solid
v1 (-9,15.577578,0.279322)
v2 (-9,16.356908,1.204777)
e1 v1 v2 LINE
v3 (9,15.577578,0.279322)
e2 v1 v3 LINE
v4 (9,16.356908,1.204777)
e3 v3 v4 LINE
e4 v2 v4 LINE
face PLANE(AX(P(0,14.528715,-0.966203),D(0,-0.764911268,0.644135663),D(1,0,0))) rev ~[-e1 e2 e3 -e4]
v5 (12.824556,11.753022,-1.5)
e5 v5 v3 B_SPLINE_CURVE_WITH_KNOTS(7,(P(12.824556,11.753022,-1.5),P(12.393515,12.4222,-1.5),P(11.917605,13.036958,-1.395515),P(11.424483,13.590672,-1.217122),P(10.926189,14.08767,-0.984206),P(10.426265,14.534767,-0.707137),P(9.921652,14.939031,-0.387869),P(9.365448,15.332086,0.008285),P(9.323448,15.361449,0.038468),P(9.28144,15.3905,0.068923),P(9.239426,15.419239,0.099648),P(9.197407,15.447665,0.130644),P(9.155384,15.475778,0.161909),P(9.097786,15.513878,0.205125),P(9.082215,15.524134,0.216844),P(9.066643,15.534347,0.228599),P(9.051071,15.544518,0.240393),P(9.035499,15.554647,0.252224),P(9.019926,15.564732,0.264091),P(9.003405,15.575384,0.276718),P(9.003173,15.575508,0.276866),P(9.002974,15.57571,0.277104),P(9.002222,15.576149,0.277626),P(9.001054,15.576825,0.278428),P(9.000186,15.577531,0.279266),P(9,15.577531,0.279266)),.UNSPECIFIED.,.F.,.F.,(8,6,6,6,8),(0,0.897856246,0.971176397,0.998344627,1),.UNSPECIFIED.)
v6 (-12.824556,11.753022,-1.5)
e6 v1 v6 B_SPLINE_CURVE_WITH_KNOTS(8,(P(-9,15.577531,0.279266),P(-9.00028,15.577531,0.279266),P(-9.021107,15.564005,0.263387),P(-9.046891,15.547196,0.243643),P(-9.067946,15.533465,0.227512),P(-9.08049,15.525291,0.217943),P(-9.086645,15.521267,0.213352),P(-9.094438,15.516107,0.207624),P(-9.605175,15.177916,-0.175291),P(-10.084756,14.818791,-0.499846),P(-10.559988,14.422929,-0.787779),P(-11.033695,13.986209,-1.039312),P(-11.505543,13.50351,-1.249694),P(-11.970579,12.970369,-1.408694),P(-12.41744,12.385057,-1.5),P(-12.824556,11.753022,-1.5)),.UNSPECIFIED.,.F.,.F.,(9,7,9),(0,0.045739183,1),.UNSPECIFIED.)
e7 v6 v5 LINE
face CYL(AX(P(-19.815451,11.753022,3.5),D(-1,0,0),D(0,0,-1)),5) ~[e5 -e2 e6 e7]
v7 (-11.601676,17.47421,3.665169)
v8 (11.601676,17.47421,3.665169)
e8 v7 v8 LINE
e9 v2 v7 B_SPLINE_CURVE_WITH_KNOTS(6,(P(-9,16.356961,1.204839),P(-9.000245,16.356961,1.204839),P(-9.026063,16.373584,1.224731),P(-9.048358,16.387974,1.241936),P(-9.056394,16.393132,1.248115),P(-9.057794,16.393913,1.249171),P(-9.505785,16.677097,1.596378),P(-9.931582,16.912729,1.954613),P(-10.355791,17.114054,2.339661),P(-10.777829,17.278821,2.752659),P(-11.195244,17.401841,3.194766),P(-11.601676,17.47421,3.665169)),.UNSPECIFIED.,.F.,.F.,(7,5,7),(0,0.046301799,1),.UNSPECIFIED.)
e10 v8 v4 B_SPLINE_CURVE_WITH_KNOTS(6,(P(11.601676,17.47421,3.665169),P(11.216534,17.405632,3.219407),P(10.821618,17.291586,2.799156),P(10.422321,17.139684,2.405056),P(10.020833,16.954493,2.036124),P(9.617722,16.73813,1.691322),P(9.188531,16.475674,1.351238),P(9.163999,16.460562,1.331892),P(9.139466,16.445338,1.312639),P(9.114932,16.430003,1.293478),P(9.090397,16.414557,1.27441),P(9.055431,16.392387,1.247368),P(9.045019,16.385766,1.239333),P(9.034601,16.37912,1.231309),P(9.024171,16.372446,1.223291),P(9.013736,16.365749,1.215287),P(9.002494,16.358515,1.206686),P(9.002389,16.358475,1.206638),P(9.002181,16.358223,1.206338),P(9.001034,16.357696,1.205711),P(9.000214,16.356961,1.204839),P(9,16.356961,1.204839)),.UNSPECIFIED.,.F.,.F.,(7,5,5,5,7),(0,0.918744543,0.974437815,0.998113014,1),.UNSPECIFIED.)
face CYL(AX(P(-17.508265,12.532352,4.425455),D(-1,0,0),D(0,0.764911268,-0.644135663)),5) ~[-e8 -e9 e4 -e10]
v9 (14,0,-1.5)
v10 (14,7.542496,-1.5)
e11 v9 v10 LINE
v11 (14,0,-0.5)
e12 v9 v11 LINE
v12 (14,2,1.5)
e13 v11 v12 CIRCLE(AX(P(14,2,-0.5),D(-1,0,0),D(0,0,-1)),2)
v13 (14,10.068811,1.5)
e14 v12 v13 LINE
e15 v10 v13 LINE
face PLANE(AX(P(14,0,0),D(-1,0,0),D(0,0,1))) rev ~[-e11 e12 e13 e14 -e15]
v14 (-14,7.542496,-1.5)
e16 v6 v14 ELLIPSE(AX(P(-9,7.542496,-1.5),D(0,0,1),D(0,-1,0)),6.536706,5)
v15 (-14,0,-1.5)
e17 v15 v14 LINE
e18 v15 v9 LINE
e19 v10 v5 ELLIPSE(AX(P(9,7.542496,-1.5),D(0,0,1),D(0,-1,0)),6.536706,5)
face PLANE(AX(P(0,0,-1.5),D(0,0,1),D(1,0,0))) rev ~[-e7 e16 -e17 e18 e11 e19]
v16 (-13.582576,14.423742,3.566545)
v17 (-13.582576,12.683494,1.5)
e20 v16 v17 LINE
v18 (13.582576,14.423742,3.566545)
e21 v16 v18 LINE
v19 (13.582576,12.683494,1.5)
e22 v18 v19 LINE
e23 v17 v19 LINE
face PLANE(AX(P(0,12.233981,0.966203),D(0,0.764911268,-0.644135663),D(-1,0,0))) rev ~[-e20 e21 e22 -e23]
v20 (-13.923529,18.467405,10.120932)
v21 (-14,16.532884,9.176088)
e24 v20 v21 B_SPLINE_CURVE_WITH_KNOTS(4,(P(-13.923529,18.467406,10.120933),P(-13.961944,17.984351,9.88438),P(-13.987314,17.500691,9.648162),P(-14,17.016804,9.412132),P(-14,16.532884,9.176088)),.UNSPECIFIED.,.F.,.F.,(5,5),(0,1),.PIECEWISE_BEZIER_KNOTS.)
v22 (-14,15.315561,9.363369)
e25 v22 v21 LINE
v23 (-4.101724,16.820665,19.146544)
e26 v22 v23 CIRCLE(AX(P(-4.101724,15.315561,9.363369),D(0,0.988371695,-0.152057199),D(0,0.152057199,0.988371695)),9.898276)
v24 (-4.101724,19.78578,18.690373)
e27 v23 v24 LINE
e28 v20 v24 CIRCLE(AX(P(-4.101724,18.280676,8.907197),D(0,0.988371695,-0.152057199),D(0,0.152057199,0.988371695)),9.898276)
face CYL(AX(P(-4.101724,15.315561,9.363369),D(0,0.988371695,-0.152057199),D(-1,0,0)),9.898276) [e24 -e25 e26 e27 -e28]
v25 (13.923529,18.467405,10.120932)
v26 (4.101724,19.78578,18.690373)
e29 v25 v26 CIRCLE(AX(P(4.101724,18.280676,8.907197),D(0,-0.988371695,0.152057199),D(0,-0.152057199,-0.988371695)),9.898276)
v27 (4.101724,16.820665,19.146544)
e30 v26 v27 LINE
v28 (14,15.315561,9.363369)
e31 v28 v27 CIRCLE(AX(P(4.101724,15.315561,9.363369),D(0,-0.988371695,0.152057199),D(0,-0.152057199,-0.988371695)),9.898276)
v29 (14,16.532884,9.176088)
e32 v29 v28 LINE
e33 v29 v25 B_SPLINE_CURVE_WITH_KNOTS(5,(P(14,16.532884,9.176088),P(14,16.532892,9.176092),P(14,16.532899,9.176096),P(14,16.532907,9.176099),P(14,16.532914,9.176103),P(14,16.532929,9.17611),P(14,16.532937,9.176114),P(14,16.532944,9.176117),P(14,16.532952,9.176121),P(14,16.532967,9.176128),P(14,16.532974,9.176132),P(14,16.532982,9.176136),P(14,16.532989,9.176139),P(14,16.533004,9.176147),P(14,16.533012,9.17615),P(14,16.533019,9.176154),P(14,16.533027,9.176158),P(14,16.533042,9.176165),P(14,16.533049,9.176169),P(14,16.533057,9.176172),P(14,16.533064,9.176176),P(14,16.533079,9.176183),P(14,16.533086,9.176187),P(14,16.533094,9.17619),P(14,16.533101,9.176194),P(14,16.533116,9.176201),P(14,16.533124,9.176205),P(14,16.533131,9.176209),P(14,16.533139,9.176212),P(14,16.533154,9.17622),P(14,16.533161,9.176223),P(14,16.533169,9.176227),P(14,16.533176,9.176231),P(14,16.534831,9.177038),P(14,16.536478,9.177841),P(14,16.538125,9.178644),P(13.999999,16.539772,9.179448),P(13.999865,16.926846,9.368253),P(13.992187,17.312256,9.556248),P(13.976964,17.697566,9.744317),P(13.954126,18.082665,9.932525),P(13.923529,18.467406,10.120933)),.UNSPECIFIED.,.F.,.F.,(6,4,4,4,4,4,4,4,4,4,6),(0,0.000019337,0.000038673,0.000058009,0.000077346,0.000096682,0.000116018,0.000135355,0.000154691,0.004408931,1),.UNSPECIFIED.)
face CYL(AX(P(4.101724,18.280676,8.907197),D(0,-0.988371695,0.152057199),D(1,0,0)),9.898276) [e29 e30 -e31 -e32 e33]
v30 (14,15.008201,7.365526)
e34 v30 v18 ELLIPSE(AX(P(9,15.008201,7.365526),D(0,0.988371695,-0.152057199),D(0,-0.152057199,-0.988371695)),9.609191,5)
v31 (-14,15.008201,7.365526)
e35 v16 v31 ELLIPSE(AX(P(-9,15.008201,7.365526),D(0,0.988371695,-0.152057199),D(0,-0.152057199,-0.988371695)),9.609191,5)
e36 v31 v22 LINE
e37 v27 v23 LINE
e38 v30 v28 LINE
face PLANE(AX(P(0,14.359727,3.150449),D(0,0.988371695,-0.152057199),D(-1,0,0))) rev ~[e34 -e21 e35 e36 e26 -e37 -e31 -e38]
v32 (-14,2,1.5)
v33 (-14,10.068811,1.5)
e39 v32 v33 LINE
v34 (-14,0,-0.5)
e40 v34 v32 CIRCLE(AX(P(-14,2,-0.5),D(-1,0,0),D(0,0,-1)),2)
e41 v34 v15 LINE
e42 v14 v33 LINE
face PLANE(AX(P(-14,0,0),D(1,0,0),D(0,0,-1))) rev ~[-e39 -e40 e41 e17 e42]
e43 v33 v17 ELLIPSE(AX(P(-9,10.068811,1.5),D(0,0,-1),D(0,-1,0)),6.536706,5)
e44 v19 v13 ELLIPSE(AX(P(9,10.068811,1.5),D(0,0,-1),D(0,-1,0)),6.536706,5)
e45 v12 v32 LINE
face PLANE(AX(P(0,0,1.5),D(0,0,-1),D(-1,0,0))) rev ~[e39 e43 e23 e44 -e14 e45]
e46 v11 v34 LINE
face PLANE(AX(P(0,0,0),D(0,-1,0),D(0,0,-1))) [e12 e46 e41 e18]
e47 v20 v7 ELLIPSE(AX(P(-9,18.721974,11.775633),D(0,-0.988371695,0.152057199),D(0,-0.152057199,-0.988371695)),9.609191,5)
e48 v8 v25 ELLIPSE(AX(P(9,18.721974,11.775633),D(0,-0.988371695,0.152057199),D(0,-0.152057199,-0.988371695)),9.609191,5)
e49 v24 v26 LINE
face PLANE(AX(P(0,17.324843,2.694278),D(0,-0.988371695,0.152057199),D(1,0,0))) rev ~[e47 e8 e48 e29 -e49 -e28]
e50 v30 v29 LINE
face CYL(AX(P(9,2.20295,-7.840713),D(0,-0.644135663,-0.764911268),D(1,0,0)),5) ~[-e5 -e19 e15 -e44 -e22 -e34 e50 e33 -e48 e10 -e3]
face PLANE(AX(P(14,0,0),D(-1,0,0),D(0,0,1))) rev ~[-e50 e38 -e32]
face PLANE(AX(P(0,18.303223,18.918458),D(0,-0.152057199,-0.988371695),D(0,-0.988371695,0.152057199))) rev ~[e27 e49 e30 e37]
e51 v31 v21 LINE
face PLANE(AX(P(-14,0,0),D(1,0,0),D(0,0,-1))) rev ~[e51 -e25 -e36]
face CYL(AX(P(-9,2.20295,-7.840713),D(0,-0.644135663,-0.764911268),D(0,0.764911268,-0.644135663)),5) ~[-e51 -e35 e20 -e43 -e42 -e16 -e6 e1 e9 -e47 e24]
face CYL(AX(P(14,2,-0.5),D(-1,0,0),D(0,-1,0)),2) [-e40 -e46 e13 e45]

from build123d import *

# Parameters (mm, degrees)
F0_W        = 28
F0_H        = 3
F3_R        = 9.8982756057
F4_R        = 2
F5_T1_DEPTH = 29.9393718709
F5_T3_DEPTH = 39.6309025582
F5_T5_DEPTH = 35.0165294795


# Not quite as in the source:
# - a fillet or chamfer that OpenCascade refuses, or shapes differently, is made with other operations: its cross-section is extruded or revolved along the edge and cut away or added


with BuildPart() as f2:
    # F2: sweep along a path in F1
    with BuildLine(Plane.YZ) as f2_path:
        Line((0, 0), (13.3813479915, 0))
        Line((13.3813479915, 0), (15.8422850072, 2.9223633464))
        Line((15.8422850072, 2.9223633464), (18.3032229543, 18.9184583724))
    # F0 (on Front) → F2 (sweep)
    with BuildSketch(Plane.XZ):
        Rectangle(F0_W, F0_H)
    sweep(path=f2_path.line, transition=Transition.RIGHT)

    # F3
    f3_edges = [f2.edges().sort_by_distance(p)[0] for p in [
        (14, 18.303223, 18.918458),
        (-14, 18.303223, 18.918458),
    ]]
    fillet(f3_edges, radius=F3_R)

    # F4
    f4_edges = [f2.edges().sort_by_distance(p)[0] for p in [
        (0, 0, 1.5),
    ]]
    fillet(f4_edges, radius=F4_R)

    # F5: fillet of radius 5 on 4 edges, made by hand

    # F5_s2 → F5_t1 (cut)
    with BuildSketch(Plane(origin=(0, -2.9491433719, -3.5021085214), x_dir=(1, 0, 0), z_dir=(0, 0.6441356632, 0.7649112677))):
        with BuildLine():
            ThreePointArc((-9, 11.7355438551), (-12.5355339059, 10.271077761), (-14, 6.7355438551))
            Line((-14, 6.7355438551), (-14, 11.7355438551))
            Line((-14, 11.7355438551), (-9, 11.7355438551))
        make_face()
        with BuildLine():
            ThreePointArc((14, 6.7355438551), (12.5355339059, 10.271077761), (9, 11.7355438551))
            Line((9, 11.7355438551), (14, 11.7355438551))
            Line((14, 11.7355438551), (14, 6.7355438551))
        make_face()
    extrude(amount=F5_T1_DEPTH, mode=Mode.SUBTRACT)

    # F5_s4 → F5_t3 (cut)
    with BuildSketch(Plane.YZ.offset(-19.8154512791)):
        with BuildLine():
            ThreePointArc((11.7530216334, -1.5), (13.8621219652, -1.0333978195), (15.5775779716, 0.279321684))
            Line((15.5775779716, 0.279321684), (14.079202145, -1.5))
            Line((14.079202145, -1.5), (11.7530216334, -1.5))
        make_face()
    extrude(amount=F5_T3_DEPTH, mode=Mode.SUBTRACT)

    # F5_s6 → F5_t5 (cut)
    with BuildSketch(Plane.YZ.offset(-17.5082647397)):
        with BuildLine():
            ThreePointArc((16.356908347, 1.2047767074), (17.0849215873, 2.3580628903), (17.4742104853, 3.6651690265))
            Line((17.4742104853, 3.6651690265), (17.2608277209, 2.2781811991))
            Line((17.2608277209, 2.2781811991), (16.356908347, 1.2047767074))
        make_face()
    extrude(amount=F5_T5_DEPTH, mode=Mode.SUBTRACT)


solid = f2.part
